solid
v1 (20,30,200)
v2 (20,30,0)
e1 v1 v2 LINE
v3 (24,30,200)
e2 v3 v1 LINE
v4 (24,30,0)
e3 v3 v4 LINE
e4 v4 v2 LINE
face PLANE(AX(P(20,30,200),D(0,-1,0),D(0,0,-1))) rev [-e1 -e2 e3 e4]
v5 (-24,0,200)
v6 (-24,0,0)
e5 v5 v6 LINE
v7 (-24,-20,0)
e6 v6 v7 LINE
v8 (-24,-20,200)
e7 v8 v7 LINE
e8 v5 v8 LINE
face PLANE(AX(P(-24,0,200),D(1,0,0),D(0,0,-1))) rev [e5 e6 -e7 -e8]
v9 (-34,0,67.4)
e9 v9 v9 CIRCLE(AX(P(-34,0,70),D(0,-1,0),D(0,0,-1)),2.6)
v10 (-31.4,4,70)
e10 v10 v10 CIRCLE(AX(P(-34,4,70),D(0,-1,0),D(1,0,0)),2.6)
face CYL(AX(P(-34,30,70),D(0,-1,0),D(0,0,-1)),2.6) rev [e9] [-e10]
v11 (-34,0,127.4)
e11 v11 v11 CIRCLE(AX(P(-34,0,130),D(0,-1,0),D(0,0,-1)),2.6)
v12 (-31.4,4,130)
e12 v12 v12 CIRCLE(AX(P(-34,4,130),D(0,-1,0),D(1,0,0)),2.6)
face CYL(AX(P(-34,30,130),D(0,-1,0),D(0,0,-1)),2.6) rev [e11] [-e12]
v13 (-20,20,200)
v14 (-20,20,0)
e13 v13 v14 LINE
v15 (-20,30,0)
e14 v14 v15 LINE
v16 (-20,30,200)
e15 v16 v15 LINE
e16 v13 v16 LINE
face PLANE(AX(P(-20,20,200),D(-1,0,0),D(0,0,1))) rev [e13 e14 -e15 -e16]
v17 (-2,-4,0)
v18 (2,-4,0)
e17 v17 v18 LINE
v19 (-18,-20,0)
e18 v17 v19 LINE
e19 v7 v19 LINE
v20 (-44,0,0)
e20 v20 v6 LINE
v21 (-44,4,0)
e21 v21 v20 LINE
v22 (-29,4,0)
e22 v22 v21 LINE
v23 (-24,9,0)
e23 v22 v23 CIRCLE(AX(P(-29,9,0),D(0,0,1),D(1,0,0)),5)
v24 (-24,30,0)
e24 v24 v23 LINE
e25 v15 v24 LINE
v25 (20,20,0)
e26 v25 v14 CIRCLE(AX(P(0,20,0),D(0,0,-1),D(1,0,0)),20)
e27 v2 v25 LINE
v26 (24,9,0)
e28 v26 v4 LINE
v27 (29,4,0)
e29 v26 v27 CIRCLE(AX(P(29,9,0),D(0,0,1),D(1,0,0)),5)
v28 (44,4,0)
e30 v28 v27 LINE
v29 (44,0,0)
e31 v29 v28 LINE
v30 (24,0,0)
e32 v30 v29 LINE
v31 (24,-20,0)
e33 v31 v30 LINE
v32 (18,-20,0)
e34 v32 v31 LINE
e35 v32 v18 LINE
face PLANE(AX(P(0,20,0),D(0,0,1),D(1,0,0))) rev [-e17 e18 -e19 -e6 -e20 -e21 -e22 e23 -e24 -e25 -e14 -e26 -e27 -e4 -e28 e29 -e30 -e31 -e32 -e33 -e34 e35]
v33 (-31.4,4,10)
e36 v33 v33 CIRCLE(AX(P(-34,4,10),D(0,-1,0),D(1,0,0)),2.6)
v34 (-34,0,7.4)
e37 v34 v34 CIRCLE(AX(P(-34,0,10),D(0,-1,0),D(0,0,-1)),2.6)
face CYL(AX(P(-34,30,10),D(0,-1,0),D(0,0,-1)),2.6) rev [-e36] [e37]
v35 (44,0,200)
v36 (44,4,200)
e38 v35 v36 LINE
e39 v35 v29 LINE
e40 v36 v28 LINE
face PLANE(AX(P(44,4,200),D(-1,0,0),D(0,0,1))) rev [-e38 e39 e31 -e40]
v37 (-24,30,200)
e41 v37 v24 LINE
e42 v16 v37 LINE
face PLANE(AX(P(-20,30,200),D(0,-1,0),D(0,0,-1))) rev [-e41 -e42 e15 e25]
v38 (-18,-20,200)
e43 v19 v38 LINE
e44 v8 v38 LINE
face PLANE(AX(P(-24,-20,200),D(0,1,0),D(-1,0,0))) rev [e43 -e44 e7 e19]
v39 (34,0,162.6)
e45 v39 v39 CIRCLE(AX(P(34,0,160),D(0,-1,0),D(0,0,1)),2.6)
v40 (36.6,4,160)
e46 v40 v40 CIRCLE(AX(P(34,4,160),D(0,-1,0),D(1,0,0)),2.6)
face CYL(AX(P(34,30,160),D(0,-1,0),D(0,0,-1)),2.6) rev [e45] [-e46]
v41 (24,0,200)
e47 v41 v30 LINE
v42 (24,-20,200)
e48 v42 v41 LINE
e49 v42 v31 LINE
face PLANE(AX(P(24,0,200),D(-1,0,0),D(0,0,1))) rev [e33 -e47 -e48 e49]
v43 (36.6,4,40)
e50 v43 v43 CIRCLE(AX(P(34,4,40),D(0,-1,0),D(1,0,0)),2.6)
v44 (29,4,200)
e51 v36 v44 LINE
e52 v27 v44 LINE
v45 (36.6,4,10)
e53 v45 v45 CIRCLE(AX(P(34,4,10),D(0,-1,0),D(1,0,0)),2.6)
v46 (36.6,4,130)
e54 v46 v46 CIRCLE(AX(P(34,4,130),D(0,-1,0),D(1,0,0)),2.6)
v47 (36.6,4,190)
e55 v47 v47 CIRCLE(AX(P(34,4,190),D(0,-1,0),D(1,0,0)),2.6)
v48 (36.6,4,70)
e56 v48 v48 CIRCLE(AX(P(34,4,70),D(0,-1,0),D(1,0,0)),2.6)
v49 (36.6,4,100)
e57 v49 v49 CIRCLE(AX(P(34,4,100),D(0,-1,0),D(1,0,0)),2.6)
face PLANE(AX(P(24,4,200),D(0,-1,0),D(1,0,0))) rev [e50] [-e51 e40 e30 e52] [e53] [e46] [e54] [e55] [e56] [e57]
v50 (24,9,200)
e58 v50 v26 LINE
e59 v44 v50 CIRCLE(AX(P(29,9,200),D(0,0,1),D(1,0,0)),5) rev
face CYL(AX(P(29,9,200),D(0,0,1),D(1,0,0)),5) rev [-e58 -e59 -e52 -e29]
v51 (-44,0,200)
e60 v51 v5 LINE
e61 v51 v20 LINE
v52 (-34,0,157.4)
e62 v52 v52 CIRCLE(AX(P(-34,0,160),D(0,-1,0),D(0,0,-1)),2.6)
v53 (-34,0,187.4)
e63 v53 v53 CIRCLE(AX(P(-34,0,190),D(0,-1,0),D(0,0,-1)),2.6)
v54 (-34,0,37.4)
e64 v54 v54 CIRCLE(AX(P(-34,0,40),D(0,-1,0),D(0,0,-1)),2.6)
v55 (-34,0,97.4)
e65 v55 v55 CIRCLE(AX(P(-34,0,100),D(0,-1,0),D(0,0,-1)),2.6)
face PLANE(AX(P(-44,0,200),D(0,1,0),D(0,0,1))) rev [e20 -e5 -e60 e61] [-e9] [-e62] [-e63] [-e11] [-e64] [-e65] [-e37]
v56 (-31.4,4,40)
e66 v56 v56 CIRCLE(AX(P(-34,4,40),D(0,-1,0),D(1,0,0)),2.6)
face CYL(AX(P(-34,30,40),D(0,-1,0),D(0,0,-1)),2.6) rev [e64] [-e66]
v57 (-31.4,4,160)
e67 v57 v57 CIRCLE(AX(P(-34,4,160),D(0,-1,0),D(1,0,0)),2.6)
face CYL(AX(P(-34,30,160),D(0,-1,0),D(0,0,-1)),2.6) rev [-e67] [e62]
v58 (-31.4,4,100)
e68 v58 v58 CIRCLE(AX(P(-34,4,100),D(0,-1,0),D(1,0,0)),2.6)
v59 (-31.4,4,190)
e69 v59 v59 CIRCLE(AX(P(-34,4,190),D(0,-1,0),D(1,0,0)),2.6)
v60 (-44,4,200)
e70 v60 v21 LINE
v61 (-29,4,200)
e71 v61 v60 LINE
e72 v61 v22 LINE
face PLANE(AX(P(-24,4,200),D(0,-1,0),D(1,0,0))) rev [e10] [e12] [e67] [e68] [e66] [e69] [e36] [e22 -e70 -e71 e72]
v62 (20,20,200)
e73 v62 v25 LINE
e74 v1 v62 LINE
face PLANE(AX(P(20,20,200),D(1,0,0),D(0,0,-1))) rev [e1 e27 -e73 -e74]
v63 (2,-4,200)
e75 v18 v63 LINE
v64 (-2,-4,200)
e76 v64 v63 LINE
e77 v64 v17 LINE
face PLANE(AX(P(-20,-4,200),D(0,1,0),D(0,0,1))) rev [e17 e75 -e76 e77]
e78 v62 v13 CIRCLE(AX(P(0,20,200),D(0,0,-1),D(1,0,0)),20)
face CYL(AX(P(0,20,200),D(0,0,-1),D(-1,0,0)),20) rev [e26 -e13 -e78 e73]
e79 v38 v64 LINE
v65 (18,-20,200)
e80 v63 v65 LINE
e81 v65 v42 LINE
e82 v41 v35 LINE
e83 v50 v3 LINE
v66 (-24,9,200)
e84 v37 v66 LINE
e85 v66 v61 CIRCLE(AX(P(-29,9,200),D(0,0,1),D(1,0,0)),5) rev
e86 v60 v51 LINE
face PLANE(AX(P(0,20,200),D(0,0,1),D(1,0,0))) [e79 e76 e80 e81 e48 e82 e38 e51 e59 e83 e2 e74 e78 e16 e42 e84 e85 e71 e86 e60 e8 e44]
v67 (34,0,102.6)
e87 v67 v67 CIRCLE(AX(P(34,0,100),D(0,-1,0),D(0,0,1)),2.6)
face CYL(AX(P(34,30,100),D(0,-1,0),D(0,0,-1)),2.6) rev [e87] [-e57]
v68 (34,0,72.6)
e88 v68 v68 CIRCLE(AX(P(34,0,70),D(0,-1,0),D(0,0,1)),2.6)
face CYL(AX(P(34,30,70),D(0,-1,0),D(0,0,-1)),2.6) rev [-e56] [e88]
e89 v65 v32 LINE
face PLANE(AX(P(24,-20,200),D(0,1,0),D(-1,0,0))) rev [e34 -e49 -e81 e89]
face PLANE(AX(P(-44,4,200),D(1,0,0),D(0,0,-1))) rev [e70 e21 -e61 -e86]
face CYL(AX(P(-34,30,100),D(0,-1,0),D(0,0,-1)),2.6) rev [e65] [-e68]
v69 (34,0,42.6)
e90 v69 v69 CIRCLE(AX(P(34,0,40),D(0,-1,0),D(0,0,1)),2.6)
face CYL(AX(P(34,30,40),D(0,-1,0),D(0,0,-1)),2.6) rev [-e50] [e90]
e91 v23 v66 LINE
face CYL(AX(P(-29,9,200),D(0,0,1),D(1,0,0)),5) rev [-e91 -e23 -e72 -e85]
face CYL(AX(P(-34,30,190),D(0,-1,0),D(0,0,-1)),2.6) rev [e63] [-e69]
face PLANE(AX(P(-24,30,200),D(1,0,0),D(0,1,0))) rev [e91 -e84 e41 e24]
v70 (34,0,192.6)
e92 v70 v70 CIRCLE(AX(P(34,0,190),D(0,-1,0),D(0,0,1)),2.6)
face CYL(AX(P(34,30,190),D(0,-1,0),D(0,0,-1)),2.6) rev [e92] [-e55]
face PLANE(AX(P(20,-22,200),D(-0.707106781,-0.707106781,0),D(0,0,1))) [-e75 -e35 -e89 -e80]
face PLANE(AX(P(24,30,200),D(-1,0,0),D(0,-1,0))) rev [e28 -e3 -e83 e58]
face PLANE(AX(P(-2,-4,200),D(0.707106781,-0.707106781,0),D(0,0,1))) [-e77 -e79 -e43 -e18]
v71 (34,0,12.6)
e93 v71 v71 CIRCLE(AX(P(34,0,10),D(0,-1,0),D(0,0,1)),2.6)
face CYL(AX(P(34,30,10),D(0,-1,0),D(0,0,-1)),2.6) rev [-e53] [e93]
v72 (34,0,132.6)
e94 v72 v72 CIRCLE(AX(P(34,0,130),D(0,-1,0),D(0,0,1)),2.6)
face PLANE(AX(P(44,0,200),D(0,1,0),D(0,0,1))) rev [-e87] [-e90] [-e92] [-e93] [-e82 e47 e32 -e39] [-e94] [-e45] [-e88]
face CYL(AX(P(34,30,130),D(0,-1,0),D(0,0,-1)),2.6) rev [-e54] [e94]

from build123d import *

# Parameters (mm, degrees)
BOSS_EXTRUDE1_DEPTH = 200
FILLET1_R           = 5
CHAMFER1_SIZE       = 18
SKETCH2_R           = 2.6
CUT_EXTRUDE1_DEPTH  = 207.968596652


with BuildPart() as part:
    # Sketch1 → Boss-Extrude1 (new body)
    with BuildSketch(Plane.XY):
        with BuildLine():
            Line((-20, 20), (-20, 30))
            Line((-20, 30), (-24, 30))
            Line((-24, 30), (-24, 4))
            Line((-24, 4), (-44, 4))
            Line((-44, 4), (-44, 0))
            Line((-44, 0), (-24, 0))
            Line((-24, 0), (-24, -20))
            Line((-24, -20), (-20, -20))
            Line((-20, -20), (-20, -4))
            Line((-20, -4), (20, -4))
            Line((20, -4), (20, -20))
            Line((20, -20), (24, -20))
            Line((24, -20), (24, 0))
            Line((24, 0), (44, 0))
            Line((44, 0), (44, 4))
            Line((44, 4), (24, 4))
            Line((24, 4), (24, 30))
            Line((24, 30), (20, 30))
            Line((20, 30), (20, 20))
            ThreePointArc((20, 20), (0, 0), (-20, 20))
        make_face()
    extrude(amount=BOSS_EXTRUDE1_DEPTH)

    # Fillet1
    fillet1_edges = [part.edges().sort_by_distance(p)[0] for p in [
        (24, 4, 100),
        (-24, 4, 100),
    ]]
    fillet(fillet1_edges, radius=FILLET1_R)

    # Chamfer1
    # the kernel refuses this chamfer: 18 mm, written as the material it adds along each edge
    with BuildSketch(Plane(origin=(20, -4, 0), x_dir=(-0.9996219169112966, 0.027495876610586365, 0), z_dir=(0, 0, 1))) as chamfer1_piece_1_section:
        Polygon((CHAMFER1_SIZE * 0.999621916911, CHAMFER1_SIZE * 0.0274958766106), (-CHAMFER1_SIZE * 0.0274958766106, CHAMFER1_SIZE * 0.999621916911), (0, 0), align=None)
    chamfer1_piece_1 = extrude(amount=200, mode=Mode.PRIVATE)
    chamfer1_piece_1 = split(chamfer1_piece_1, bisect_by=Plane(origin=(13.93765318, -20, 100), z_dir=(0, 1, 0)), keep=Keep.TOP, mode=Mode.PRIVATE)
    add(chamfer1_piece_1)
    with BuildSketch(Plane(origin=(-20, -4, 0), x_dir=(-0.027495876610586584, -0.9996219169112966, 0), z_dir=(0, 0, 1))) as chamfer1_piece_2_section:
        Polygon((CHAMFER1_SIZE * 0.999621916911, CHAMFER1_SIZE * 0.0274958766106), (-CHAMFER1_SIZE * 0.0274958766106, CHAMFER1_SIZE * 0.999621916911), (0, 0), align=None)
    chamfer1_piece_2 = extrude(amount=200, mode=Mode.PRIVATE)
    chamfer1_piece_2 = split(chamfer1_piece_2, bisect_by=Plane(origin=(-13.93765318, -20, 100), z_dir=(0, 1, 0)), keep=Keep.TOP, mode=Mode.PRIVATE)
    add(chamfer1_piece_2)

    # Sketch2 → Cut-Extrude1 (cut, through all)
    with BuildSketch(Plane.XZ):
        with Locations(Location((-34, 190, 0), (0, 0, 270))):
            Circle(SKETCH2_R)
        with Locations(Location((-34, 160, 0), (0, 0, 270))):
            Circle(SKETCH2_R)
        with Locations(Location((-34, 130, 0), (0, 0, 270))):
            Circle(SKETCH2_R)
        with Locations(Location((-34, 100, 0), (0, 0, 270))):
            Circle(SKETCH2_R)
        with Locations(Location((-34, 70, 0), (0, 0, 270))):
            Circle(SKETCH2_R)
        with Locations(Location((-34, 40, 0), (0, 0, 270))):
            Circle(SKETCH2_R)
        with Locations(Location((-34, 10, 0), (0, 0, 270))):
            Circle(SKETCH2_R)
        with Locations((34, 10)):
            Circle(SKETCH2_R)
        with Locations((34, 40)):
            Circle(SKETCH2_R)
        with Locations((34, 70)):
            Circle(SKETCH2_R)
        with Locations((34, 100)):
            Circle(SKETCH2_R)
        with Locations((34, 130)):
            Circle(SKETCH2_R)
        with Locations((34, 160)):
            Circle(SKETCH2_R)
        with Locations((34, 190)):
            Circle(SKETCH2_R)
    extrude(amount=-CUT_EXTRUDE1_DEPTH, mode=Mode.SUBTRACT)


solid = part.part
